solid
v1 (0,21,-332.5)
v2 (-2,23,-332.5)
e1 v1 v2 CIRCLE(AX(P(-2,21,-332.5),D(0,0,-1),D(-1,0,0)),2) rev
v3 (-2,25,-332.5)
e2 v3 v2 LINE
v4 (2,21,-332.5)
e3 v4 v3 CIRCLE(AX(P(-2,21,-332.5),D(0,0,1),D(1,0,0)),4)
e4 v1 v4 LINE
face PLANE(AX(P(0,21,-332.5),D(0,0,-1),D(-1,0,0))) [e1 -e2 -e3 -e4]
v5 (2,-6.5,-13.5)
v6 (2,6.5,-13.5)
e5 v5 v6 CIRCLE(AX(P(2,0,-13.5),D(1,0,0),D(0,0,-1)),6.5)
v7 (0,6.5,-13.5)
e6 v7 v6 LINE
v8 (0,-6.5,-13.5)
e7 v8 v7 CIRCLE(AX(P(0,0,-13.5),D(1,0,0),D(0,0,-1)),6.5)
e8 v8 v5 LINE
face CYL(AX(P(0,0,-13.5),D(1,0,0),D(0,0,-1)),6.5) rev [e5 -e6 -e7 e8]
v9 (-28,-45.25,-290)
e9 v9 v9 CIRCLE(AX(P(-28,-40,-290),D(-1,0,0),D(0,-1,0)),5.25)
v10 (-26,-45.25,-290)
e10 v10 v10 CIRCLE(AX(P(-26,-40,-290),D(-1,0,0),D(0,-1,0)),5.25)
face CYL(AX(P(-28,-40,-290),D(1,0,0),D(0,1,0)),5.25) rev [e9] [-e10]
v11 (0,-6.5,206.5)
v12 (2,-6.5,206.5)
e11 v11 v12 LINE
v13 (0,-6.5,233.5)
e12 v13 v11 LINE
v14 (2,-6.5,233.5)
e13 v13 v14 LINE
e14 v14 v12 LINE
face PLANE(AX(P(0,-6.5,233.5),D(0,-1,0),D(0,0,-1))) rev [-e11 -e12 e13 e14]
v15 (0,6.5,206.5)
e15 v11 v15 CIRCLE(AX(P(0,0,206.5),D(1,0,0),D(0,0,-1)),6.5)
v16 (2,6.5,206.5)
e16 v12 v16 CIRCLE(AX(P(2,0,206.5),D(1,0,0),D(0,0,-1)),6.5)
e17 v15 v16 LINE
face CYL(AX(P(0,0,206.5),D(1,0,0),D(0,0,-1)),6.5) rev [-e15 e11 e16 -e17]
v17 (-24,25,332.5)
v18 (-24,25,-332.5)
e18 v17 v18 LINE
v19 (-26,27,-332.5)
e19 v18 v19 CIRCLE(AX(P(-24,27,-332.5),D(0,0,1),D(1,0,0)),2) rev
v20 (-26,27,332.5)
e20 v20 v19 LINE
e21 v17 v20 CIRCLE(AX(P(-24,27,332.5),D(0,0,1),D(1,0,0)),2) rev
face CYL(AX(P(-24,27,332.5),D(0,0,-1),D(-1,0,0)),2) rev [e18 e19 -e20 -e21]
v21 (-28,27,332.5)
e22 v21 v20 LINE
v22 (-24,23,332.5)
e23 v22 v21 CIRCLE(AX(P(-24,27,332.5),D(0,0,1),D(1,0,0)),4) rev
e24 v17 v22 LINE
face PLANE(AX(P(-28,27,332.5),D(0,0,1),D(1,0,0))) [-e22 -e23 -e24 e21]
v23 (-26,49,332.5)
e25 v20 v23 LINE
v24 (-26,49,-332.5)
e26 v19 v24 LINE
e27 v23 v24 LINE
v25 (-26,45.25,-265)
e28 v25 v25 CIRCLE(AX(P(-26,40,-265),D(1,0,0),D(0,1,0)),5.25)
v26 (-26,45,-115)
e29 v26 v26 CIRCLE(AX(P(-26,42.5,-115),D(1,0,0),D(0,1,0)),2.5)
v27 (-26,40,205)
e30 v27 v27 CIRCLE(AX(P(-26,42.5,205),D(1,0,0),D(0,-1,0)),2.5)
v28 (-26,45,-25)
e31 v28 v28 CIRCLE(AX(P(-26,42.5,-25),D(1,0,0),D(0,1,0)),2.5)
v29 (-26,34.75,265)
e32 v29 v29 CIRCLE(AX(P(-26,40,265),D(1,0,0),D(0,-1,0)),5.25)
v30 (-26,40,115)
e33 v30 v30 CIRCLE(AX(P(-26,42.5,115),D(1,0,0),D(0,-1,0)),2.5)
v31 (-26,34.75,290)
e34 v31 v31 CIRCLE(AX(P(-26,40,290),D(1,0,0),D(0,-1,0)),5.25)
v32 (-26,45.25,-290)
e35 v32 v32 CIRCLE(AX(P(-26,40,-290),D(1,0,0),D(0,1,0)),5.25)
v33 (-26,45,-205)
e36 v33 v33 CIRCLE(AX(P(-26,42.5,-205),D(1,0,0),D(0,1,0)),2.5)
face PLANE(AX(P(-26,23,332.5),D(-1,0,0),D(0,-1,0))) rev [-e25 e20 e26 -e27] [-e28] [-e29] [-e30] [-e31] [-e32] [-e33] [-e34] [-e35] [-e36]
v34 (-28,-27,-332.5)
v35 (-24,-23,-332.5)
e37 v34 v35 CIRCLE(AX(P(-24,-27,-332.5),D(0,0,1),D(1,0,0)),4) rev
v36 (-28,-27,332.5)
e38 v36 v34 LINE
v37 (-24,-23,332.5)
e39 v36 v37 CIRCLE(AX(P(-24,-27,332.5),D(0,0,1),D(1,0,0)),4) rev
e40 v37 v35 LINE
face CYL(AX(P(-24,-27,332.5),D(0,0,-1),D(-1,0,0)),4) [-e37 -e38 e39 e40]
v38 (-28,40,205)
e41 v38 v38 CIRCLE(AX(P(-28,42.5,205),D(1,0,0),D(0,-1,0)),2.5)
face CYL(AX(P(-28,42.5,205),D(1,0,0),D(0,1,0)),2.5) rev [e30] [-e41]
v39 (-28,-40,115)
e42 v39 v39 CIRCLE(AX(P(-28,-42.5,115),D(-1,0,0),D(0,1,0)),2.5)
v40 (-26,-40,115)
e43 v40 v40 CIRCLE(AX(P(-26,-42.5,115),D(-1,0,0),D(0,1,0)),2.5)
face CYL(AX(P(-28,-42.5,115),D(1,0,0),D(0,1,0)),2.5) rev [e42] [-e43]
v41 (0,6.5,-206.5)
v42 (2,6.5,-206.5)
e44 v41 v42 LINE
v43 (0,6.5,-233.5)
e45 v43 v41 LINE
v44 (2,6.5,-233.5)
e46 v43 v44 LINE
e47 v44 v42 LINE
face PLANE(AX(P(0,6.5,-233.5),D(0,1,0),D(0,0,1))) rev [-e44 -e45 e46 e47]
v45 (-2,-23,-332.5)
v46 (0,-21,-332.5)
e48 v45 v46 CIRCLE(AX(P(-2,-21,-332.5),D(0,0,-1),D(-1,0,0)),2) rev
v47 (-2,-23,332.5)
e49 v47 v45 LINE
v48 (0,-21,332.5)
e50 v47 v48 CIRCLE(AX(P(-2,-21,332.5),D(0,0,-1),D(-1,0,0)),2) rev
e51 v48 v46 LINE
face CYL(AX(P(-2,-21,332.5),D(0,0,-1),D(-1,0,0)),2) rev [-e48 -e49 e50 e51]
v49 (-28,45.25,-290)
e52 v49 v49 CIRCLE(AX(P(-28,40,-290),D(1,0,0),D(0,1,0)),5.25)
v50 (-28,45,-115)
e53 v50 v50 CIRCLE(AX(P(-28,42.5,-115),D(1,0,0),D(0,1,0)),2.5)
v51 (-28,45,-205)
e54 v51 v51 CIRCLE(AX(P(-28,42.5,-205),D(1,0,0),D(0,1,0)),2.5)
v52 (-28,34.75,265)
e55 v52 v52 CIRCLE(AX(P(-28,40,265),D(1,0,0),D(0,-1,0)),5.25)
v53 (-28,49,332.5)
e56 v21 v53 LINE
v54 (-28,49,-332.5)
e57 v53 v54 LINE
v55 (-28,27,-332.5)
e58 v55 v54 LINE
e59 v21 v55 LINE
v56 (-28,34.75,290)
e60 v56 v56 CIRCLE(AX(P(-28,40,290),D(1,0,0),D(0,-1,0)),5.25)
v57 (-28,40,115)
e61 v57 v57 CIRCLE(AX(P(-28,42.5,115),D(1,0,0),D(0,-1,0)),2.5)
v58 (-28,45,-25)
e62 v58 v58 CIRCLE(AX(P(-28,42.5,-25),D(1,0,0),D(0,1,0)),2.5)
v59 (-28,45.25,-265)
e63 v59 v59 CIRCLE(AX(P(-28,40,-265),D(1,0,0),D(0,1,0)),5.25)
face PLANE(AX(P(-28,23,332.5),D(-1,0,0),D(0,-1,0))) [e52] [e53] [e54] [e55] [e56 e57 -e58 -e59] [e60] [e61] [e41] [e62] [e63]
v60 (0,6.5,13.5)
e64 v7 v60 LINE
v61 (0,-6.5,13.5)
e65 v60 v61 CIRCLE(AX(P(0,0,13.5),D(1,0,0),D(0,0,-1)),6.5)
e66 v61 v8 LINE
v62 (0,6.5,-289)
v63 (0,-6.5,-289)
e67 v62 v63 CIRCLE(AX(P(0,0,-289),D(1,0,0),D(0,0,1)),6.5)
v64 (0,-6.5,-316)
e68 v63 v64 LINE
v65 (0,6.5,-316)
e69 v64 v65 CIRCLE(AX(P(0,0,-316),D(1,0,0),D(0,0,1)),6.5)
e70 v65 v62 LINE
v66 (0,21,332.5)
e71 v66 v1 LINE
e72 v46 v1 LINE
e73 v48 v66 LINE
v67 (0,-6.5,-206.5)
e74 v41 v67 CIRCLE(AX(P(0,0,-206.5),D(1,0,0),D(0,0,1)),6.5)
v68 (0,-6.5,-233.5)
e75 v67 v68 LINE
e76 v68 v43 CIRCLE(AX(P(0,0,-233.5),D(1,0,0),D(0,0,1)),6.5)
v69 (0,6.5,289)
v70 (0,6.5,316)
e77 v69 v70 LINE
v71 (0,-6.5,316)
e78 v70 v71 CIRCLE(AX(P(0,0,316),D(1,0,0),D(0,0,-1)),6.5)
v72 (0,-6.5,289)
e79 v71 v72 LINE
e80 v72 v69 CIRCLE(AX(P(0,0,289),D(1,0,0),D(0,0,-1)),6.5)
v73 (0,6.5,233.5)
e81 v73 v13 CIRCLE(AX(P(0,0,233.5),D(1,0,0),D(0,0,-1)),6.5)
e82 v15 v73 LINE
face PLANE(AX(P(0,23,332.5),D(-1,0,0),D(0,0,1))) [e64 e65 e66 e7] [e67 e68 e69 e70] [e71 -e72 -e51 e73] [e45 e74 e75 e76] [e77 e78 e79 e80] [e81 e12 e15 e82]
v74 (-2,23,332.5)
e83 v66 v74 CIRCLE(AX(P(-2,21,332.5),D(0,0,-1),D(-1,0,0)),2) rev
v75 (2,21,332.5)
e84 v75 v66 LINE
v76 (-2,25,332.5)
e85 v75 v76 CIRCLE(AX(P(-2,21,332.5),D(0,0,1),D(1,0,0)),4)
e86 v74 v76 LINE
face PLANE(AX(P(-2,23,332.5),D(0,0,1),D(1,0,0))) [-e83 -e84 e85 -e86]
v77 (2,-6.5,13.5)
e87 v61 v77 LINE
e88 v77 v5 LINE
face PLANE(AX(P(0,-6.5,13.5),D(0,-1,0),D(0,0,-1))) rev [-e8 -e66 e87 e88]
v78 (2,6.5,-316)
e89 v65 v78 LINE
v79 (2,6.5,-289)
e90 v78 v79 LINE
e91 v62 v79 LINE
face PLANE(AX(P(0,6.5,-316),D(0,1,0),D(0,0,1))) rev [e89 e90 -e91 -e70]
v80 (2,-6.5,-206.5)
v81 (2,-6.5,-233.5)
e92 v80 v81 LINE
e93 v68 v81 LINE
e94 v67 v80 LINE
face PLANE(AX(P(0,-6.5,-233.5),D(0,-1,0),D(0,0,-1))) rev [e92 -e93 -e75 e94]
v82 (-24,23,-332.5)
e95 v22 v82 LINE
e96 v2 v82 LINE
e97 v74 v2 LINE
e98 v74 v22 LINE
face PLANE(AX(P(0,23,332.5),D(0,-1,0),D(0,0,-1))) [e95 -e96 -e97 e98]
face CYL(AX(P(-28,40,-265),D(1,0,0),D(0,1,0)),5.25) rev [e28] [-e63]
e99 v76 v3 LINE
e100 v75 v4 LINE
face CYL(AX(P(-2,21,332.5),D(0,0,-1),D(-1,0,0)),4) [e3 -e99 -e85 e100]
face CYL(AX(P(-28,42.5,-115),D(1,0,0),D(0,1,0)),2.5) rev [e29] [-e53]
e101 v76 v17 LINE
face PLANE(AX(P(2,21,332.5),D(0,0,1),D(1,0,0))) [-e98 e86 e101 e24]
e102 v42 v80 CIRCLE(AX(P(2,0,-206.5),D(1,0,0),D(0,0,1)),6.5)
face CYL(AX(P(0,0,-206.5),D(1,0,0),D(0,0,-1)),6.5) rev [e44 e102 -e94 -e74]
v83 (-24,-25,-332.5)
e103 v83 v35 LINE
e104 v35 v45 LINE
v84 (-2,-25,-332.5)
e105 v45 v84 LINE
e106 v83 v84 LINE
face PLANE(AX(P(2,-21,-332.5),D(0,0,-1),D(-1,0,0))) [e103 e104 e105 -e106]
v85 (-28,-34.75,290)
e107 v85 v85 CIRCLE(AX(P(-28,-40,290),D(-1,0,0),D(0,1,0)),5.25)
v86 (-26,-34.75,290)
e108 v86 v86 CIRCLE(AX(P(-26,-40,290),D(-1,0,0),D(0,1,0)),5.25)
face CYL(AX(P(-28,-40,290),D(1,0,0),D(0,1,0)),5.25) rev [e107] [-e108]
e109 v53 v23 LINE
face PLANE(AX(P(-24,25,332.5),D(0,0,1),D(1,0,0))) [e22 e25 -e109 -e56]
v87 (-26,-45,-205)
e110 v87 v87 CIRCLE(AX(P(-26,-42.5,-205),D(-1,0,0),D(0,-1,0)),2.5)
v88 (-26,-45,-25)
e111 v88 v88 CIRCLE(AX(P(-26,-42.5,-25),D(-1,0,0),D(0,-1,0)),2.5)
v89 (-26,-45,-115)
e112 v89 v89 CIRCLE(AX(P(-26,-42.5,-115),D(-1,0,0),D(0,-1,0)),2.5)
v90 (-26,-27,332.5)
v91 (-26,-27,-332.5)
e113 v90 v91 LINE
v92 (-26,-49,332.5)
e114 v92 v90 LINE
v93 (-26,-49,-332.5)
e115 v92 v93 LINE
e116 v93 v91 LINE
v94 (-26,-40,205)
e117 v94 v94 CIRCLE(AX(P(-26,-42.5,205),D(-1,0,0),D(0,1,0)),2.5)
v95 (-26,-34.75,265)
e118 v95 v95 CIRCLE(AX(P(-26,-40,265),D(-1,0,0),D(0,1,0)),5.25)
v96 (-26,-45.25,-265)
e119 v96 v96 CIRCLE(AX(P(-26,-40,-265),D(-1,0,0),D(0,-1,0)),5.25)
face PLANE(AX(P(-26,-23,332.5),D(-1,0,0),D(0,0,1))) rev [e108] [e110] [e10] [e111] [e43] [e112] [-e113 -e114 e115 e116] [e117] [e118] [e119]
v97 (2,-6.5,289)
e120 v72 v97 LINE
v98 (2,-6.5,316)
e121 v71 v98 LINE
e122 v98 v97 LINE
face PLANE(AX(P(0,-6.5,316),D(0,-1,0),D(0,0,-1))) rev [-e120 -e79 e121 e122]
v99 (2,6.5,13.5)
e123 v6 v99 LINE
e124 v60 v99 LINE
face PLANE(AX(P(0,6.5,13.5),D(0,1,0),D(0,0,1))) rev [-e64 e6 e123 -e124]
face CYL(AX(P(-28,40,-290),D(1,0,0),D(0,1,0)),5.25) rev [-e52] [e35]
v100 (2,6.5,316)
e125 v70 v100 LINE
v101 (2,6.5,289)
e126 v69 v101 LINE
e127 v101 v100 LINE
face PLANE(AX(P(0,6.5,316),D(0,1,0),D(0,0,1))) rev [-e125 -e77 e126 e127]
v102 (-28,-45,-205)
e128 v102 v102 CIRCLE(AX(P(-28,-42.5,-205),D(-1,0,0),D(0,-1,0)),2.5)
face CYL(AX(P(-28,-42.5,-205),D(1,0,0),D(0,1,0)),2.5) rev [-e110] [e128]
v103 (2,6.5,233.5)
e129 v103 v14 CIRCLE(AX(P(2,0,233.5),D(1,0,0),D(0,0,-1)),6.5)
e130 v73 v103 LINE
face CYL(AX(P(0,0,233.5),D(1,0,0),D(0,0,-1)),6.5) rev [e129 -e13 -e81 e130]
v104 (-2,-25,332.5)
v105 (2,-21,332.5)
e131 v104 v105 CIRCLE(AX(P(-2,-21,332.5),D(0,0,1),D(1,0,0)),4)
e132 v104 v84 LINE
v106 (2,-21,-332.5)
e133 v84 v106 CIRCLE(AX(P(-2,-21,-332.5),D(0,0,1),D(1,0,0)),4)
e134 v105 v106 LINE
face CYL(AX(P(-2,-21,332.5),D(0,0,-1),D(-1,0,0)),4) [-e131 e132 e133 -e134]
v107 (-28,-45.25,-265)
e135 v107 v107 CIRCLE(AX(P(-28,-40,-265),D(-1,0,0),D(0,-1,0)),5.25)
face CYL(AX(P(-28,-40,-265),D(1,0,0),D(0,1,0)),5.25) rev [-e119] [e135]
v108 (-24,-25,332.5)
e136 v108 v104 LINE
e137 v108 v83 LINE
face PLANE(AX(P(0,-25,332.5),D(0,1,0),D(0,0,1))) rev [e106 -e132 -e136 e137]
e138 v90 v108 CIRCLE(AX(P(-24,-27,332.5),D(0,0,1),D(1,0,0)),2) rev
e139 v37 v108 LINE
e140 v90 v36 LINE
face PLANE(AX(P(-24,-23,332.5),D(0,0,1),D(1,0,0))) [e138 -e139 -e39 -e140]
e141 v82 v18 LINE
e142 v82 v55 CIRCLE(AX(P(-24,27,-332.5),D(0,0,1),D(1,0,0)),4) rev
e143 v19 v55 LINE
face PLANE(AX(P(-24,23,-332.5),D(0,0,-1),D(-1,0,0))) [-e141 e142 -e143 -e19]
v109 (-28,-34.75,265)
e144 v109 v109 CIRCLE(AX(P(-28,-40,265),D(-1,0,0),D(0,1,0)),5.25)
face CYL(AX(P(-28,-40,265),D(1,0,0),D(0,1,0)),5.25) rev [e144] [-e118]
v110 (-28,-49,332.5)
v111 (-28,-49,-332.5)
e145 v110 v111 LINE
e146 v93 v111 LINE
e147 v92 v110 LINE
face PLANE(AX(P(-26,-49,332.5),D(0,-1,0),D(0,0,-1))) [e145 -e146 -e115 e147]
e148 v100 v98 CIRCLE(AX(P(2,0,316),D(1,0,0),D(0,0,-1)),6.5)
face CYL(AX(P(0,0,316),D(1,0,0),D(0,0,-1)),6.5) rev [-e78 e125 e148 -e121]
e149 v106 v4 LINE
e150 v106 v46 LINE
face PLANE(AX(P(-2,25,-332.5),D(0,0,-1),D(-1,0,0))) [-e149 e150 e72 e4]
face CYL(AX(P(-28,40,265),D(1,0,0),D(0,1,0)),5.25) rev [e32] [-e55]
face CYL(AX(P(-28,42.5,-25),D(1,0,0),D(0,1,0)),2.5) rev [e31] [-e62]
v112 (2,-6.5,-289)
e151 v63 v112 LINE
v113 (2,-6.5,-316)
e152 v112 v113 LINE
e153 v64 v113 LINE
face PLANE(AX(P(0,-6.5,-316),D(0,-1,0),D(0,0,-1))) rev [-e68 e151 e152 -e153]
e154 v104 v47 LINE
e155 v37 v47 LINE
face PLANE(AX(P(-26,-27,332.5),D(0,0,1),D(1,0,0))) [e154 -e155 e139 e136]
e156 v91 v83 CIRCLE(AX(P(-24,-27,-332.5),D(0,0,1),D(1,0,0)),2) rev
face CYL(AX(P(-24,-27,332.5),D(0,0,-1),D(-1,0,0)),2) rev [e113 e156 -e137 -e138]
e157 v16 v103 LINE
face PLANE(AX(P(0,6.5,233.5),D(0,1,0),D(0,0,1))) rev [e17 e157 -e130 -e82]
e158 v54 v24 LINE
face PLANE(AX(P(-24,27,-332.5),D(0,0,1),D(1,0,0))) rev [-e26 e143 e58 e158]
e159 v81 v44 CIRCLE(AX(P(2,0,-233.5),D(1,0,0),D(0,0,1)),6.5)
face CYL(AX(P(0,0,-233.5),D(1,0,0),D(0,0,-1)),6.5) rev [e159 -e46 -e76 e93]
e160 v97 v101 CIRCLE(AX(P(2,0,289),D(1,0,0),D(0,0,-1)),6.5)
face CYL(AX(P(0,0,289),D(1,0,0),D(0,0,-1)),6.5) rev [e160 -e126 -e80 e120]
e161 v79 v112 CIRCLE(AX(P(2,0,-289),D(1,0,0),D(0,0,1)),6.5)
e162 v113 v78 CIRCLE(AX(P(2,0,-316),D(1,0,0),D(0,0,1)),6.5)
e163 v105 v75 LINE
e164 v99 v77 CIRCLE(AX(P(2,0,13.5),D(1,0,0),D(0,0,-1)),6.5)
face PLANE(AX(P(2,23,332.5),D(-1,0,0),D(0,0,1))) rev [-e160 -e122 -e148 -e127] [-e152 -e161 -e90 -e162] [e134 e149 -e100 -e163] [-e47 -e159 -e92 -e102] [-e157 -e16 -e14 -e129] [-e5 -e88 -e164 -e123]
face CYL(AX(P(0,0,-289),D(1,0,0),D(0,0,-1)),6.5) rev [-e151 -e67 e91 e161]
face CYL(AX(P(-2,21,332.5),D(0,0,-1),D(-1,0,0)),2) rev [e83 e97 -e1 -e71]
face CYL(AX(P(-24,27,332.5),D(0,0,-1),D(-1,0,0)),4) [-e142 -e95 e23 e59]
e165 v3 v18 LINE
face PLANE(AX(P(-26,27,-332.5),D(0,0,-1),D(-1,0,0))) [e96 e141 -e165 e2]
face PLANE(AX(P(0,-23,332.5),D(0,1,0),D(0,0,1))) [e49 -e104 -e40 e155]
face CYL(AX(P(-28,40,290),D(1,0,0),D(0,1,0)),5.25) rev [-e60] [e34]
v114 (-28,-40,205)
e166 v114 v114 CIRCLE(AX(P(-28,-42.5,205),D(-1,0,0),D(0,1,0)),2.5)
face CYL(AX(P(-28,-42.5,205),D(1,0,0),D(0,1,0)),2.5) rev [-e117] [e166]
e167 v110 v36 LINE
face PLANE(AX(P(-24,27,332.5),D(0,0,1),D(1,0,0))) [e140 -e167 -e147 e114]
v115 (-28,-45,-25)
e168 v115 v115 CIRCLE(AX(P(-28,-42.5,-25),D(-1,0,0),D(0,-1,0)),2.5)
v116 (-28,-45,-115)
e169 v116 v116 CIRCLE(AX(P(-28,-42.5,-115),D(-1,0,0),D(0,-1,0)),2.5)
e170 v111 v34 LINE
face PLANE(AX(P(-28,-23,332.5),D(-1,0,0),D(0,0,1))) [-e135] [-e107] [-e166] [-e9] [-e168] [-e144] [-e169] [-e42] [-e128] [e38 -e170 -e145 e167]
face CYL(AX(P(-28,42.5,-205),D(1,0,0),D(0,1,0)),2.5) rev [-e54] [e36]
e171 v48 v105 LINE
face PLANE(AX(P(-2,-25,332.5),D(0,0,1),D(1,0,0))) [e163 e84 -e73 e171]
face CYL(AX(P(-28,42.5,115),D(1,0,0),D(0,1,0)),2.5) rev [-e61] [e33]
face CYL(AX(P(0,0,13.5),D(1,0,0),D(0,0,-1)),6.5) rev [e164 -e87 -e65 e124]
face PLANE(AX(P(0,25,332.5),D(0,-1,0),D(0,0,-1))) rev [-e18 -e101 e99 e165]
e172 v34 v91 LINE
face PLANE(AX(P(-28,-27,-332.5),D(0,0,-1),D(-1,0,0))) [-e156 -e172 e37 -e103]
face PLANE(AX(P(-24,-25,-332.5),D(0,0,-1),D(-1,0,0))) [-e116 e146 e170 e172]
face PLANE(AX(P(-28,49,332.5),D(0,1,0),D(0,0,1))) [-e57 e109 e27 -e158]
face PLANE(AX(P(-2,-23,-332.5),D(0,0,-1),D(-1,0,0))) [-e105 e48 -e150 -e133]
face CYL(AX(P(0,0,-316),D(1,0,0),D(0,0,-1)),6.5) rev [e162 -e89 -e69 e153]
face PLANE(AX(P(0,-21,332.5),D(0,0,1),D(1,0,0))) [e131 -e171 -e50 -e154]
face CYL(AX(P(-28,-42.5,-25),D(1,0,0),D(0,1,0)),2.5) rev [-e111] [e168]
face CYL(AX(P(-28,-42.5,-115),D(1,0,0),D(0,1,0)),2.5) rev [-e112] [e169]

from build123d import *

# Parameters (mm, degrees)
SM_BASE_FLANGE_1_DEPTH = 332.5
SKETCH_6_R             = 5.25
SKETCH_6_R_2           = 2.5
CUT_EXTRUDE_1_DEPTH    = 10
CUT_EXTRUDE_2_DEPTH    = 10


# Sheet-metal steps are written as plain solids
with BuildPart() as part:
    # Sketch 1 → Базовая кромка1 (new, symmetric)
    with BuildSketch(Plane.XY):
        with BuildLine():
            Line((-28, 49), (-28, 27))
            ThreePointArc((-28, 27), (-26.828427125, 24.171572875), (-24, 23))
            Line((-24, 23), (-2, 23))
            ThreePointArc((-2, 23), (-0.585786438, 22.414213562), (0, 21))
            Line((0, 21), (0, -21))
            ThreePointArc((0, -21), (-0.585786438, -22.414213562), (-2, -23))
            Line((-2, -23), (-24, -23))
            ThreePointArc((-24, -23), (-26.828427125, -24.171572875), (-28, -27))
            Line((-28, -27), (-28, -49))
            Line((-28, -49), (-26, -49))
            Line((-26, -49), (-26, -27))
            ThreePointArc((-26, -27), (-25.414213562, -25.585786438), (-24, -25))
            Line((-24, -25), (-2, -25))
            ThreePointArc((-2, -25), (0.828427125, -23.828427125), (2, -21))
            Line((2, -21), (2, 21))
            ThreePointArc((2, 21), (0.828427125, 23.828427125), (-2, 25))
            Line((-2, 25), (-24, 25))
            ThreePointArc((-24, 25), (-25.414213562, 25.585786438), (-26, 27))
            Line((-26, 27), (-26, 49))
            Line((-26, 49), (-28, 49))
        make_face()
    extrude(amount=SM_BASE_FLANGE_1_DEPTH, both=True)

    # Эскиз6 → Вырез-Вытянуть1 (cut)
    with BuildSketch(Plane(origin=(-26, 0, 0), x_dir=(0, 0, -1), z_dir=(1, 0, 0))):
        with Locations(Location((290, 40, 0), (0, 0, 90))):
            Circle(SKETCH_6_R)
        with Locations(Location((265, 40, 0), (0, 0, 90))):
            Circle(SKETCH_6_R)
        with Locations(Location((205, 42.5, 0), (0, 0, 90))):
            Circle(SKETCH_6_R_2)
        with Locations(Location((115, 42.5, 0), (0, 0, 90))):
            Circle(SKETCH_6_R_2)
        with Locations(Location((25, 42.5, 0), (0, 0, 90))):
            Circle(SKETCH_6_R_2)
        with Locations(Location((-115, 42.5, 0), (0, 0, 270))):
            Circle(SKETCH_6_R_2)
        with Locations(Location((-205, 42.5, 0), (0, 0, 270))):
            Circle(SKETCH_6_R_2)
        with Locations(Location((-265, 40, 0), (0, 0, 270))):
            Circle(SKETCH_6_R)
        with Locations(Location((-290, 40, 0), (0, 0, 270))):
            Circle(SKETCH_6_R)
    cut_extrude_1 = extrude(amount=-CUT_EXTRUDE_1_DEPTH, mode=Mode.SUBTRACT)

    # Зеркальное отражение1: Вырез-Вытянуть1 across plane
    add(cut_extrude_1.mirror(Plane.ZX), mode=Mode.SUBTRACT)

    # Эскиз7 → Вырез-Вытянуть2 (cut)
    with BuildSketch(Plane(origin=(2, 0, 0), x_dir=(0, 0, -1), z_dir=(1, 0, 0))):
        with BuildLine():
            Line((-316, 6.5), (-289, 6.5))
            ThreePointArc((-289, 6.5), (-282.5, 0), (-289, -6.5))
            Line((-289, -6.5), (-316, -6.5))
            ThreePointArc((-316, -6.5), (-322.5, 0), (-316, 6.5))
        make_face()
        with BuildLine():
            Line((-233.5, 6.5), (-206.5, 6.5))
            ThreePointArc((-206.5, 6.5), (-200, 0), (-206.5, -6.5))
            Line((-206.5, -6.5), (-233.5, -6.5))
            ThreePointArc((-233.5, -6.5), (-240, 0), (-233.5, 6.5))
        make_face()
        with BuildLine():
            Line((-13.5, 6.5), (13.5, 6.5))
            ThreePointArc((13.5, 6.5), (20, 0), (13.5, -6.5))
            Line((13.5, -6.5), (-13.5, -6.5))
            ThreePointArc((-13.5, -6.5), (-20, 0), (-13.5, 6.5))
        make_face()
        with BuildLine():
            Line((316, 6.5), (289, 6.5))
            ThreePointArc((289, 6.5), (282.5, 0), (289, -6.5))
            Line((289, -6.5), (316, -6.5))
            ThreePointArc((316, -6.5), (322.5, 0), (316, 6.5))
        make_face()
        with BuildLine():
            Line((233.5, 6.5), (206.5, 6.5))
            ThreePointArc((206.5, 6.5), (200, 0), (206.5, -6.5))
            Line((206.5, -6.5), (233.5, -6.5))
            ThreePointArc((233.5, -6.5), (240, 0), (233.5, 6.5))
        make_face()
    extrude(amount=-CUT_EXTRUDE_2_DEPTH, mode=Mode.SUBTRACT)


solid = part.part
